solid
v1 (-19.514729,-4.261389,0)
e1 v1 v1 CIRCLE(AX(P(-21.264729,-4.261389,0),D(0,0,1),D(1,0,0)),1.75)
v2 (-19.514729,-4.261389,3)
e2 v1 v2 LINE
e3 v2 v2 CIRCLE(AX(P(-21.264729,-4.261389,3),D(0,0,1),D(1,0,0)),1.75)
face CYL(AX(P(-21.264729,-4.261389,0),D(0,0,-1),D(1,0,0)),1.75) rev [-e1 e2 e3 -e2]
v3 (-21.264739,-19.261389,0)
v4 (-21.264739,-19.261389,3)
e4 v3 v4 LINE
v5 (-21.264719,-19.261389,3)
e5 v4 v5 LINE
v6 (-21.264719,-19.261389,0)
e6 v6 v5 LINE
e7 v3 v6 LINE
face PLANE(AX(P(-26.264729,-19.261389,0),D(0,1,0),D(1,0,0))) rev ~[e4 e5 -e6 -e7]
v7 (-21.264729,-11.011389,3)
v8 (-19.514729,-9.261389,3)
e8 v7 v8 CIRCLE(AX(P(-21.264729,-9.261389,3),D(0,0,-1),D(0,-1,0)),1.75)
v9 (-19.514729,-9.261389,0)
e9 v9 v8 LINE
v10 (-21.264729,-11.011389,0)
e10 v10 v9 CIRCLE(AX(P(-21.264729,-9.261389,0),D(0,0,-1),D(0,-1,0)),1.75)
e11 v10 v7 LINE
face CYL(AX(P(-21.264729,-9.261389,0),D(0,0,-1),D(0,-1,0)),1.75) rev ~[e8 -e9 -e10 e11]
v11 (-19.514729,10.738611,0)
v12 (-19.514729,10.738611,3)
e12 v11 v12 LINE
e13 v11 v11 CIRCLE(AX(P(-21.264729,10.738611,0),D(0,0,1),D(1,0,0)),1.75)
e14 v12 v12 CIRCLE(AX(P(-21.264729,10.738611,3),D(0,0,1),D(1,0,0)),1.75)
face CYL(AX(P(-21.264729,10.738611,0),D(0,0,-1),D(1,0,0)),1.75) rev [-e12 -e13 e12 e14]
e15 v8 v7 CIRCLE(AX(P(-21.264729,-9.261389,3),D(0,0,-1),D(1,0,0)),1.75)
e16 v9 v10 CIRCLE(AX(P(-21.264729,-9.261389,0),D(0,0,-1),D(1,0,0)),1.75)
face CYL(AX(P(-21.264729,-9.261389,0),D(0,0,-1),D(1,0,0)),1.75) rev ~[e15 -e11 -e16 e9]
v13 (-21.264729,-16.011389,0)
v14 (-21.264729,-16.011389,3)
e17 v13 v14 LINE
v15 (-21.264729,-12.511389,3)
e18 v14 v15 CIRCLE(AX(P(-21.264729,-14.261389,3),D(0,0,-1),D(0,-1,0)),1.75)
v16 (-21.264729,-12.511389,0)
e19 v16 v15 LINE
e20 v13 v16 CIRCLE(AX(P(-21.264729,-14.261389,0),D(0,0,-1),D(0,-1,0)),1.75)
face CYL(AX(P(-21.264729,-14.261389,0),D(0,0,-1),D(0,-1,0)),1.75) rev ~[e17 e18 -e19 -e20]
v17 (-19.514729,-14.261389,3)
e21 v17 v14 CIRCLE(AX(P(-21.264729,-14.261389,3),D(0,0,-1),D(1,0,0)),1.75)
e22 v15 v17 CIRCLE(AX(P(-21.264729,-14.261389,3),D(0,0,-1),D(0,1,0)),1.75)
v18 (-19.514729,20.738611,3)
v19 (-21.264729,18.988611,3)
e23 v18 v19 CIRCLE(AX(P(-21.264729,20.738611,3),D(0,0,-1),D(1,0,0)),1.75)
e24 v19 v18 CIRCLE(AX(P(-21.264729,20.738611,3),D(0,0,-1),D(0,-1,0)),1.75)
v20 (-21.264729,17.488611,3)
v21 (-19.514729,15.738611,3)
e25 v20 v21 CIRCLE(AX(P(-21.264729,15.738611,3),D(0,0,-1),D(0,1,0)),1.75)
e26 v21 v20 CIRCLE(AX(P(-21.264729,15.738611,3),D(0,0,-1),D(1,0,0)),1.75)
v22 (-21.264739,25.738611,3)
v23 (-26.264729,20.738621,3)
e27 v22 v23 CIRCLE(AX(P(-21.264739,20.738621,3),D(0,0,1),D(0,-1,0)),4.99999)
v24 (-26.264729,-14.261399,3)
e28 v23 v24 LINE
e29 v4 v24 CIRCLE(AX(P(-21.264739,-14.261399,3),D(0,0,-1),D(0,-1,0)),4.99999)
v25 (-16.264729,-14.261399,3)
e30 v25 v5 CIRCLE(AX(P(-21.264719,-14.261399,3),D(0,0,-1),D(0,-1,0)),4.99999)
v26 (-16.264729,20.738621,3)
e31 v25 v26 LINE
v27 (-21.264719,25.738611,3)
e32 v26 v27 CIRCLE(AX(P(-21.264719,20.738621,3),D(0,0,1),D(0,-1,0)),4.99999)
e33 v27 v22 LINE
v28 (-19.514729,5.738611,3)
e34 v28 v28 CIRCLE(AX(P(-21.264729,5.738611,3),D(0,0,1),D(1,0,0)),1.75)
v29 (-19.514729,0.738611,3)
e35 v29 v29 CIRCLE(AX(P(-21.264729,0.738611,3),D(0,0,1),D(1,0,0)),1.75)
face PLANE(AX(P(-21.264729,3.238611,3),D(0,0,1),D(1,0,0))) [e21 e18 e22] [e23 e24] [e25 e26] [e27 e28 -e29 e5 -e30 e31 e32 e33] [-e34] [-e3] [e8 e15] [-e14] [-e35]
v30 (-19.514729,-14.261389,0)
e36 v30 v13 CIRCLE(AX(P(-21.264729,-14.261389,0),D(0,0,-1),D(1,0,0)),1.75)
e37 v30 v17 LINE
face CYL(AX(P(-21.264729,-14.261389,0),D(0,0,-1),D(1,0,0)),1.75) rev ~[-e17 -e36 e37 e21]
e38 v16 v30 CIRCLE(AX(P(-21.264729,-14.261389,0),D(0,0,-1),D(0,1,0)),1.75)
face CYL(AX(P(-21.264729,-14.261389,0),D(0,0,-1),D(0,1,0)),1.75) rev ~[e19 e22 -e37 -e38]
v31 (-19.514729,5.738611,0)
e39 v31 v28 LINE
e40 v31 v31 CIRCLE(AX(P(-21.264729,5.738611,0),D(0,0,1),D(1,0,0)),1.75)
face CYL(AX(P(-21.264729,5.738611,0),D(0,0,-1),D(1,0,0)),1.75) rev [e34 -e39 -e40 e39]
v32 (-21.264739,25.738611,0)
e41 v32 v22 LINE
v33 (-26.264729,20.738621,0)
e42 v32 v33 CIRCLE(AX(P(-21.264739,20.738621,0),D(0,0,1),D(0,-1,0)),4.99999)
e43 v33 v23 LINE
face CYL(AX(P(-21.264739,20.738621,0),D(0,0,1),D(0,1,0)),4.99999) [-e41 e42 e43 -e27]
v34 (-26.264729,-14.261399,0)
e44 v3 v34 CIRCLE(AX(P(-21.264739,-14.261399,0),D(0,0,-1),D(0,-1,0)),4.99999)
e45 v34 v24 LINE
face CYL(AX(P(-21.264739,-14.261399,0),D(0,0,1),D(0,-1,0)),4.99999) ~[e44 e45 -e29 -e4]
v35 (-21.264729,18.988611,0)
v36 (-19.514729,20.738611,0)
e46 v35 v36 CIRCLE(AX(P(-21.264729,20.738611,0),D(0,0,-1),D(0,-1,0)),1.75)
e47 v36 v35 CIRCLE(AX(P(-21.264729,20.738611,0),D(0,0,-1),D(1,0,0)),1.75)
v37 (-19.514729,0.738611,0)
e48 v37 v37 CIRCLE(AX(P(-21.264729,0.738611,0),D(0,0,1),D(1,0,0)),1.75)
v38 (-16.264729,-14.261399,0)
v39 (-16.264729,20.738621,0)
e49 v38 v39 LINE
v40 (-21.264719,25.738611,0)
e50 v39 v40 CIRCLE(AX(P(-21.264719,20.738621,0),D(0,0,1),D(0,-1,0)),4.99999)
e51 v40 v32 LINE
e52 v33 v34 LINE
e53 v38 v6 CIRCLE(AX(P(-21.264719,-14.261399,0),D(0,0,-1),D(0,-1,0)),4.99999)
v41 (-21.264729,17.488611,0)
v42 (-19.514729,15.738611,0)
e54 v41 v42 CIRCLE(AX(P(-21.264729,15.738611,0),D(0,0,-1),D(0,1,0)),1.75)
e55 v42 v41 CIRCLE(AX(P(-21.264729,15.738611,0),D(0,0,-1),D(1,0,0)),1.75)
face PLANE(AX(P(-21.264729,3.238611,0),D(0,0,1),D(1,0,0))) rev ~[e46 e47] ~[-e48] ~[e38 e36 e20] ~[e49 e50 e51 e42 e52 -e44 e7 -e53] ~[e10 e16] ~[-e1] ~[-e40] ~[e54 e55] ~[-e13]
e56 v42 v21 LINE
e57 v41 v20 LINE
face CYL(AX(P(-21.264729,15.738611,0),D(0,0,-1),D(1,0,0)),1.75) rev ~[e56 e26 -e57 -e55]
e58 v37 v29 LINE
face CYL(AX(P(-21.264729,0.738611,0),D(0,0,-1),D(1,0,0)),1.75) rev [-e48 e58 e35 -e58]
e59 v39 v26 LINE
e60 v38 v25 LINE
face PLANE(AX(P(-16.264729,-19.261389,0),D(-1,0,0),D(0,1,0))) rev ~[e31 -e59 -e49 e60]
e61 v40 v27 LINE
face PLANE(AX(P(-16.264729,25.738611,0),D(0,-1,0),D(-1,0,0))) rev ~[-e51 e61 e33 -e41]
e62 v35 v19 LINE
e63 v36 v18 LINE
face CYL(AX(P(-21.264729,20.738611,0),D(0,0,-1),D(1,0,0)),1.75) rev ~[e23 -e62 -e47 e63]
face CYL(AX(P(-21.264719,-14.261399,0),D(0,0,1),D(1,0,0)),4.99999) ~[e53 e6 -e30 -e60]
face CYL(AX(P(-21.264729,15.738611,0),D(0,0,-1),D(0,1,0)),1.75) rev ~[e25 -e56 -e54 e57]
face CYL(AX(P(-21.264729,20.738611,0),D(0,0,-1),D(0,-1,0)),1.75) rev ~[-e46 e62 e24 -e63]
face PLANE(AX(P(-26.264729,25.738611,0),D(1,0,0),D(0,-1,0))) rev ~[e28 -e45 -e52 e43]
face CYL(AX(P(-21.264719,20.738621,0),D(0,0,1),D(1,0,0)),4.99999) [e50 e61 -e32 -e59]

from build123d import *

# Parameters (mm, degrees)
F0_R     = 1.75
F1_DEPTH = 3
F2_R     = 4.99999


# Not quite as in the source:
# - a fillet or chamfer is up to 0.001 mm smaller than in the source, because OpenCascade refuses the exact size


with BuildPart() as f1:
    # F0 (on Top) → F1 (new body)
    with BuildSketch(Plane.XY):
        Polygon((-16.2647291371, -19.261389355), (-16.2647291371, 20.738610645), (-16.2647291371, 25.738610645), (-26.2647291371, 25.738610645), (-26.2647291371, 3.238610645), (-26.2647291371, -19.261389355), (-21.2647291371, -19.261389355), align=None)
        with BuildLine():
            ThreePointArc((-19.5147291371, -14.261389355), (-20.0272922701, -15.4988262221), (-21.2647291371, -16.011389355))
            ThreePointArc((-21.2647291371, -16.011389355), (-23.0147291371, -14.261389355), (-21.2647291371, -12.511389355))
            ThreePointArc((-21.2647291371, -12.511389355), (-20.0272922701, -13.0239524879), (-19.5147291371, -14.261389355))
        make_face(mode=Mode.SUBTRACT)
        with BuildLine():
            ThreePointArc((-19.5147291371, -9.261389355), (-20.0272922701, -10.4988262221), (-21.2647291371, -11.011389355))
            ThreePointArc((-21.2647291371, -11.011389355), (-22.5021660042, -8.0239524879), (-19.5147291371, -9.261389355))
        make_face(mode=Mode.SUBTRACT)
        with Locations((-21.2647291371, -4.261389355)):
            Circle(F0_R, mode=Mode.SUBTRACT)
        with Locations((-21.2647291371, 0.738610645)):
            Circle(F0_R, mode=Mode.SUBTRACT)
        with Locations((-21.2647291371, 5.738610645)):
            Circle(F0_R, mode=Mode.SUBTRACT)
        with Locations((-21.2647291371, 10.738610645)):
            Circle(F0_R, mode=Mode.SUBTRACT)
        with BuildLine():
            ThreePointArc((-19.5147291371, 15.738610645), (-22.5021660042, 14.5011737779), (-21.2647291371, 17.488610645))
            ThreePointArc((-21.2647291371, 17.488610645), (-20.0272922701, 16.9760475121), (-19.5147291371, 15.738610645))
        make_face(mode=Mode.SUBTRACT)
        with BuildLine():
            ThreePointArc((-19.5147291371, 20.738610645), (-20.0272922701, 19.5011737779), (-21.2647291371, 18.988610645))
            ThreePointArc((-21.2647291371, 18.988610645), (-22.5021660042, 21.9760475121), (-19.5147291371, 20.738610645))
        make_face(mode=Mode.SUBTRACT)
    extrude(amount=F1_DEPTH)

    # F2 (radius 5 in the source; OpenCascade refuses exactly that, so slightly less here)
    f2_edges = [f1.edges().sort_by_distance(p)[0] for p in [
        (-16.264729, 25.738611, 1.5),
        (-26.264729, 25.738611, 1.5),
        (-16.264729, -19.261389, 1.5),
        (-26.264729, -19.261389, 1.5),
    ]]
    fillet(f2_edges, radius=F2_R)


solid = f1.part
